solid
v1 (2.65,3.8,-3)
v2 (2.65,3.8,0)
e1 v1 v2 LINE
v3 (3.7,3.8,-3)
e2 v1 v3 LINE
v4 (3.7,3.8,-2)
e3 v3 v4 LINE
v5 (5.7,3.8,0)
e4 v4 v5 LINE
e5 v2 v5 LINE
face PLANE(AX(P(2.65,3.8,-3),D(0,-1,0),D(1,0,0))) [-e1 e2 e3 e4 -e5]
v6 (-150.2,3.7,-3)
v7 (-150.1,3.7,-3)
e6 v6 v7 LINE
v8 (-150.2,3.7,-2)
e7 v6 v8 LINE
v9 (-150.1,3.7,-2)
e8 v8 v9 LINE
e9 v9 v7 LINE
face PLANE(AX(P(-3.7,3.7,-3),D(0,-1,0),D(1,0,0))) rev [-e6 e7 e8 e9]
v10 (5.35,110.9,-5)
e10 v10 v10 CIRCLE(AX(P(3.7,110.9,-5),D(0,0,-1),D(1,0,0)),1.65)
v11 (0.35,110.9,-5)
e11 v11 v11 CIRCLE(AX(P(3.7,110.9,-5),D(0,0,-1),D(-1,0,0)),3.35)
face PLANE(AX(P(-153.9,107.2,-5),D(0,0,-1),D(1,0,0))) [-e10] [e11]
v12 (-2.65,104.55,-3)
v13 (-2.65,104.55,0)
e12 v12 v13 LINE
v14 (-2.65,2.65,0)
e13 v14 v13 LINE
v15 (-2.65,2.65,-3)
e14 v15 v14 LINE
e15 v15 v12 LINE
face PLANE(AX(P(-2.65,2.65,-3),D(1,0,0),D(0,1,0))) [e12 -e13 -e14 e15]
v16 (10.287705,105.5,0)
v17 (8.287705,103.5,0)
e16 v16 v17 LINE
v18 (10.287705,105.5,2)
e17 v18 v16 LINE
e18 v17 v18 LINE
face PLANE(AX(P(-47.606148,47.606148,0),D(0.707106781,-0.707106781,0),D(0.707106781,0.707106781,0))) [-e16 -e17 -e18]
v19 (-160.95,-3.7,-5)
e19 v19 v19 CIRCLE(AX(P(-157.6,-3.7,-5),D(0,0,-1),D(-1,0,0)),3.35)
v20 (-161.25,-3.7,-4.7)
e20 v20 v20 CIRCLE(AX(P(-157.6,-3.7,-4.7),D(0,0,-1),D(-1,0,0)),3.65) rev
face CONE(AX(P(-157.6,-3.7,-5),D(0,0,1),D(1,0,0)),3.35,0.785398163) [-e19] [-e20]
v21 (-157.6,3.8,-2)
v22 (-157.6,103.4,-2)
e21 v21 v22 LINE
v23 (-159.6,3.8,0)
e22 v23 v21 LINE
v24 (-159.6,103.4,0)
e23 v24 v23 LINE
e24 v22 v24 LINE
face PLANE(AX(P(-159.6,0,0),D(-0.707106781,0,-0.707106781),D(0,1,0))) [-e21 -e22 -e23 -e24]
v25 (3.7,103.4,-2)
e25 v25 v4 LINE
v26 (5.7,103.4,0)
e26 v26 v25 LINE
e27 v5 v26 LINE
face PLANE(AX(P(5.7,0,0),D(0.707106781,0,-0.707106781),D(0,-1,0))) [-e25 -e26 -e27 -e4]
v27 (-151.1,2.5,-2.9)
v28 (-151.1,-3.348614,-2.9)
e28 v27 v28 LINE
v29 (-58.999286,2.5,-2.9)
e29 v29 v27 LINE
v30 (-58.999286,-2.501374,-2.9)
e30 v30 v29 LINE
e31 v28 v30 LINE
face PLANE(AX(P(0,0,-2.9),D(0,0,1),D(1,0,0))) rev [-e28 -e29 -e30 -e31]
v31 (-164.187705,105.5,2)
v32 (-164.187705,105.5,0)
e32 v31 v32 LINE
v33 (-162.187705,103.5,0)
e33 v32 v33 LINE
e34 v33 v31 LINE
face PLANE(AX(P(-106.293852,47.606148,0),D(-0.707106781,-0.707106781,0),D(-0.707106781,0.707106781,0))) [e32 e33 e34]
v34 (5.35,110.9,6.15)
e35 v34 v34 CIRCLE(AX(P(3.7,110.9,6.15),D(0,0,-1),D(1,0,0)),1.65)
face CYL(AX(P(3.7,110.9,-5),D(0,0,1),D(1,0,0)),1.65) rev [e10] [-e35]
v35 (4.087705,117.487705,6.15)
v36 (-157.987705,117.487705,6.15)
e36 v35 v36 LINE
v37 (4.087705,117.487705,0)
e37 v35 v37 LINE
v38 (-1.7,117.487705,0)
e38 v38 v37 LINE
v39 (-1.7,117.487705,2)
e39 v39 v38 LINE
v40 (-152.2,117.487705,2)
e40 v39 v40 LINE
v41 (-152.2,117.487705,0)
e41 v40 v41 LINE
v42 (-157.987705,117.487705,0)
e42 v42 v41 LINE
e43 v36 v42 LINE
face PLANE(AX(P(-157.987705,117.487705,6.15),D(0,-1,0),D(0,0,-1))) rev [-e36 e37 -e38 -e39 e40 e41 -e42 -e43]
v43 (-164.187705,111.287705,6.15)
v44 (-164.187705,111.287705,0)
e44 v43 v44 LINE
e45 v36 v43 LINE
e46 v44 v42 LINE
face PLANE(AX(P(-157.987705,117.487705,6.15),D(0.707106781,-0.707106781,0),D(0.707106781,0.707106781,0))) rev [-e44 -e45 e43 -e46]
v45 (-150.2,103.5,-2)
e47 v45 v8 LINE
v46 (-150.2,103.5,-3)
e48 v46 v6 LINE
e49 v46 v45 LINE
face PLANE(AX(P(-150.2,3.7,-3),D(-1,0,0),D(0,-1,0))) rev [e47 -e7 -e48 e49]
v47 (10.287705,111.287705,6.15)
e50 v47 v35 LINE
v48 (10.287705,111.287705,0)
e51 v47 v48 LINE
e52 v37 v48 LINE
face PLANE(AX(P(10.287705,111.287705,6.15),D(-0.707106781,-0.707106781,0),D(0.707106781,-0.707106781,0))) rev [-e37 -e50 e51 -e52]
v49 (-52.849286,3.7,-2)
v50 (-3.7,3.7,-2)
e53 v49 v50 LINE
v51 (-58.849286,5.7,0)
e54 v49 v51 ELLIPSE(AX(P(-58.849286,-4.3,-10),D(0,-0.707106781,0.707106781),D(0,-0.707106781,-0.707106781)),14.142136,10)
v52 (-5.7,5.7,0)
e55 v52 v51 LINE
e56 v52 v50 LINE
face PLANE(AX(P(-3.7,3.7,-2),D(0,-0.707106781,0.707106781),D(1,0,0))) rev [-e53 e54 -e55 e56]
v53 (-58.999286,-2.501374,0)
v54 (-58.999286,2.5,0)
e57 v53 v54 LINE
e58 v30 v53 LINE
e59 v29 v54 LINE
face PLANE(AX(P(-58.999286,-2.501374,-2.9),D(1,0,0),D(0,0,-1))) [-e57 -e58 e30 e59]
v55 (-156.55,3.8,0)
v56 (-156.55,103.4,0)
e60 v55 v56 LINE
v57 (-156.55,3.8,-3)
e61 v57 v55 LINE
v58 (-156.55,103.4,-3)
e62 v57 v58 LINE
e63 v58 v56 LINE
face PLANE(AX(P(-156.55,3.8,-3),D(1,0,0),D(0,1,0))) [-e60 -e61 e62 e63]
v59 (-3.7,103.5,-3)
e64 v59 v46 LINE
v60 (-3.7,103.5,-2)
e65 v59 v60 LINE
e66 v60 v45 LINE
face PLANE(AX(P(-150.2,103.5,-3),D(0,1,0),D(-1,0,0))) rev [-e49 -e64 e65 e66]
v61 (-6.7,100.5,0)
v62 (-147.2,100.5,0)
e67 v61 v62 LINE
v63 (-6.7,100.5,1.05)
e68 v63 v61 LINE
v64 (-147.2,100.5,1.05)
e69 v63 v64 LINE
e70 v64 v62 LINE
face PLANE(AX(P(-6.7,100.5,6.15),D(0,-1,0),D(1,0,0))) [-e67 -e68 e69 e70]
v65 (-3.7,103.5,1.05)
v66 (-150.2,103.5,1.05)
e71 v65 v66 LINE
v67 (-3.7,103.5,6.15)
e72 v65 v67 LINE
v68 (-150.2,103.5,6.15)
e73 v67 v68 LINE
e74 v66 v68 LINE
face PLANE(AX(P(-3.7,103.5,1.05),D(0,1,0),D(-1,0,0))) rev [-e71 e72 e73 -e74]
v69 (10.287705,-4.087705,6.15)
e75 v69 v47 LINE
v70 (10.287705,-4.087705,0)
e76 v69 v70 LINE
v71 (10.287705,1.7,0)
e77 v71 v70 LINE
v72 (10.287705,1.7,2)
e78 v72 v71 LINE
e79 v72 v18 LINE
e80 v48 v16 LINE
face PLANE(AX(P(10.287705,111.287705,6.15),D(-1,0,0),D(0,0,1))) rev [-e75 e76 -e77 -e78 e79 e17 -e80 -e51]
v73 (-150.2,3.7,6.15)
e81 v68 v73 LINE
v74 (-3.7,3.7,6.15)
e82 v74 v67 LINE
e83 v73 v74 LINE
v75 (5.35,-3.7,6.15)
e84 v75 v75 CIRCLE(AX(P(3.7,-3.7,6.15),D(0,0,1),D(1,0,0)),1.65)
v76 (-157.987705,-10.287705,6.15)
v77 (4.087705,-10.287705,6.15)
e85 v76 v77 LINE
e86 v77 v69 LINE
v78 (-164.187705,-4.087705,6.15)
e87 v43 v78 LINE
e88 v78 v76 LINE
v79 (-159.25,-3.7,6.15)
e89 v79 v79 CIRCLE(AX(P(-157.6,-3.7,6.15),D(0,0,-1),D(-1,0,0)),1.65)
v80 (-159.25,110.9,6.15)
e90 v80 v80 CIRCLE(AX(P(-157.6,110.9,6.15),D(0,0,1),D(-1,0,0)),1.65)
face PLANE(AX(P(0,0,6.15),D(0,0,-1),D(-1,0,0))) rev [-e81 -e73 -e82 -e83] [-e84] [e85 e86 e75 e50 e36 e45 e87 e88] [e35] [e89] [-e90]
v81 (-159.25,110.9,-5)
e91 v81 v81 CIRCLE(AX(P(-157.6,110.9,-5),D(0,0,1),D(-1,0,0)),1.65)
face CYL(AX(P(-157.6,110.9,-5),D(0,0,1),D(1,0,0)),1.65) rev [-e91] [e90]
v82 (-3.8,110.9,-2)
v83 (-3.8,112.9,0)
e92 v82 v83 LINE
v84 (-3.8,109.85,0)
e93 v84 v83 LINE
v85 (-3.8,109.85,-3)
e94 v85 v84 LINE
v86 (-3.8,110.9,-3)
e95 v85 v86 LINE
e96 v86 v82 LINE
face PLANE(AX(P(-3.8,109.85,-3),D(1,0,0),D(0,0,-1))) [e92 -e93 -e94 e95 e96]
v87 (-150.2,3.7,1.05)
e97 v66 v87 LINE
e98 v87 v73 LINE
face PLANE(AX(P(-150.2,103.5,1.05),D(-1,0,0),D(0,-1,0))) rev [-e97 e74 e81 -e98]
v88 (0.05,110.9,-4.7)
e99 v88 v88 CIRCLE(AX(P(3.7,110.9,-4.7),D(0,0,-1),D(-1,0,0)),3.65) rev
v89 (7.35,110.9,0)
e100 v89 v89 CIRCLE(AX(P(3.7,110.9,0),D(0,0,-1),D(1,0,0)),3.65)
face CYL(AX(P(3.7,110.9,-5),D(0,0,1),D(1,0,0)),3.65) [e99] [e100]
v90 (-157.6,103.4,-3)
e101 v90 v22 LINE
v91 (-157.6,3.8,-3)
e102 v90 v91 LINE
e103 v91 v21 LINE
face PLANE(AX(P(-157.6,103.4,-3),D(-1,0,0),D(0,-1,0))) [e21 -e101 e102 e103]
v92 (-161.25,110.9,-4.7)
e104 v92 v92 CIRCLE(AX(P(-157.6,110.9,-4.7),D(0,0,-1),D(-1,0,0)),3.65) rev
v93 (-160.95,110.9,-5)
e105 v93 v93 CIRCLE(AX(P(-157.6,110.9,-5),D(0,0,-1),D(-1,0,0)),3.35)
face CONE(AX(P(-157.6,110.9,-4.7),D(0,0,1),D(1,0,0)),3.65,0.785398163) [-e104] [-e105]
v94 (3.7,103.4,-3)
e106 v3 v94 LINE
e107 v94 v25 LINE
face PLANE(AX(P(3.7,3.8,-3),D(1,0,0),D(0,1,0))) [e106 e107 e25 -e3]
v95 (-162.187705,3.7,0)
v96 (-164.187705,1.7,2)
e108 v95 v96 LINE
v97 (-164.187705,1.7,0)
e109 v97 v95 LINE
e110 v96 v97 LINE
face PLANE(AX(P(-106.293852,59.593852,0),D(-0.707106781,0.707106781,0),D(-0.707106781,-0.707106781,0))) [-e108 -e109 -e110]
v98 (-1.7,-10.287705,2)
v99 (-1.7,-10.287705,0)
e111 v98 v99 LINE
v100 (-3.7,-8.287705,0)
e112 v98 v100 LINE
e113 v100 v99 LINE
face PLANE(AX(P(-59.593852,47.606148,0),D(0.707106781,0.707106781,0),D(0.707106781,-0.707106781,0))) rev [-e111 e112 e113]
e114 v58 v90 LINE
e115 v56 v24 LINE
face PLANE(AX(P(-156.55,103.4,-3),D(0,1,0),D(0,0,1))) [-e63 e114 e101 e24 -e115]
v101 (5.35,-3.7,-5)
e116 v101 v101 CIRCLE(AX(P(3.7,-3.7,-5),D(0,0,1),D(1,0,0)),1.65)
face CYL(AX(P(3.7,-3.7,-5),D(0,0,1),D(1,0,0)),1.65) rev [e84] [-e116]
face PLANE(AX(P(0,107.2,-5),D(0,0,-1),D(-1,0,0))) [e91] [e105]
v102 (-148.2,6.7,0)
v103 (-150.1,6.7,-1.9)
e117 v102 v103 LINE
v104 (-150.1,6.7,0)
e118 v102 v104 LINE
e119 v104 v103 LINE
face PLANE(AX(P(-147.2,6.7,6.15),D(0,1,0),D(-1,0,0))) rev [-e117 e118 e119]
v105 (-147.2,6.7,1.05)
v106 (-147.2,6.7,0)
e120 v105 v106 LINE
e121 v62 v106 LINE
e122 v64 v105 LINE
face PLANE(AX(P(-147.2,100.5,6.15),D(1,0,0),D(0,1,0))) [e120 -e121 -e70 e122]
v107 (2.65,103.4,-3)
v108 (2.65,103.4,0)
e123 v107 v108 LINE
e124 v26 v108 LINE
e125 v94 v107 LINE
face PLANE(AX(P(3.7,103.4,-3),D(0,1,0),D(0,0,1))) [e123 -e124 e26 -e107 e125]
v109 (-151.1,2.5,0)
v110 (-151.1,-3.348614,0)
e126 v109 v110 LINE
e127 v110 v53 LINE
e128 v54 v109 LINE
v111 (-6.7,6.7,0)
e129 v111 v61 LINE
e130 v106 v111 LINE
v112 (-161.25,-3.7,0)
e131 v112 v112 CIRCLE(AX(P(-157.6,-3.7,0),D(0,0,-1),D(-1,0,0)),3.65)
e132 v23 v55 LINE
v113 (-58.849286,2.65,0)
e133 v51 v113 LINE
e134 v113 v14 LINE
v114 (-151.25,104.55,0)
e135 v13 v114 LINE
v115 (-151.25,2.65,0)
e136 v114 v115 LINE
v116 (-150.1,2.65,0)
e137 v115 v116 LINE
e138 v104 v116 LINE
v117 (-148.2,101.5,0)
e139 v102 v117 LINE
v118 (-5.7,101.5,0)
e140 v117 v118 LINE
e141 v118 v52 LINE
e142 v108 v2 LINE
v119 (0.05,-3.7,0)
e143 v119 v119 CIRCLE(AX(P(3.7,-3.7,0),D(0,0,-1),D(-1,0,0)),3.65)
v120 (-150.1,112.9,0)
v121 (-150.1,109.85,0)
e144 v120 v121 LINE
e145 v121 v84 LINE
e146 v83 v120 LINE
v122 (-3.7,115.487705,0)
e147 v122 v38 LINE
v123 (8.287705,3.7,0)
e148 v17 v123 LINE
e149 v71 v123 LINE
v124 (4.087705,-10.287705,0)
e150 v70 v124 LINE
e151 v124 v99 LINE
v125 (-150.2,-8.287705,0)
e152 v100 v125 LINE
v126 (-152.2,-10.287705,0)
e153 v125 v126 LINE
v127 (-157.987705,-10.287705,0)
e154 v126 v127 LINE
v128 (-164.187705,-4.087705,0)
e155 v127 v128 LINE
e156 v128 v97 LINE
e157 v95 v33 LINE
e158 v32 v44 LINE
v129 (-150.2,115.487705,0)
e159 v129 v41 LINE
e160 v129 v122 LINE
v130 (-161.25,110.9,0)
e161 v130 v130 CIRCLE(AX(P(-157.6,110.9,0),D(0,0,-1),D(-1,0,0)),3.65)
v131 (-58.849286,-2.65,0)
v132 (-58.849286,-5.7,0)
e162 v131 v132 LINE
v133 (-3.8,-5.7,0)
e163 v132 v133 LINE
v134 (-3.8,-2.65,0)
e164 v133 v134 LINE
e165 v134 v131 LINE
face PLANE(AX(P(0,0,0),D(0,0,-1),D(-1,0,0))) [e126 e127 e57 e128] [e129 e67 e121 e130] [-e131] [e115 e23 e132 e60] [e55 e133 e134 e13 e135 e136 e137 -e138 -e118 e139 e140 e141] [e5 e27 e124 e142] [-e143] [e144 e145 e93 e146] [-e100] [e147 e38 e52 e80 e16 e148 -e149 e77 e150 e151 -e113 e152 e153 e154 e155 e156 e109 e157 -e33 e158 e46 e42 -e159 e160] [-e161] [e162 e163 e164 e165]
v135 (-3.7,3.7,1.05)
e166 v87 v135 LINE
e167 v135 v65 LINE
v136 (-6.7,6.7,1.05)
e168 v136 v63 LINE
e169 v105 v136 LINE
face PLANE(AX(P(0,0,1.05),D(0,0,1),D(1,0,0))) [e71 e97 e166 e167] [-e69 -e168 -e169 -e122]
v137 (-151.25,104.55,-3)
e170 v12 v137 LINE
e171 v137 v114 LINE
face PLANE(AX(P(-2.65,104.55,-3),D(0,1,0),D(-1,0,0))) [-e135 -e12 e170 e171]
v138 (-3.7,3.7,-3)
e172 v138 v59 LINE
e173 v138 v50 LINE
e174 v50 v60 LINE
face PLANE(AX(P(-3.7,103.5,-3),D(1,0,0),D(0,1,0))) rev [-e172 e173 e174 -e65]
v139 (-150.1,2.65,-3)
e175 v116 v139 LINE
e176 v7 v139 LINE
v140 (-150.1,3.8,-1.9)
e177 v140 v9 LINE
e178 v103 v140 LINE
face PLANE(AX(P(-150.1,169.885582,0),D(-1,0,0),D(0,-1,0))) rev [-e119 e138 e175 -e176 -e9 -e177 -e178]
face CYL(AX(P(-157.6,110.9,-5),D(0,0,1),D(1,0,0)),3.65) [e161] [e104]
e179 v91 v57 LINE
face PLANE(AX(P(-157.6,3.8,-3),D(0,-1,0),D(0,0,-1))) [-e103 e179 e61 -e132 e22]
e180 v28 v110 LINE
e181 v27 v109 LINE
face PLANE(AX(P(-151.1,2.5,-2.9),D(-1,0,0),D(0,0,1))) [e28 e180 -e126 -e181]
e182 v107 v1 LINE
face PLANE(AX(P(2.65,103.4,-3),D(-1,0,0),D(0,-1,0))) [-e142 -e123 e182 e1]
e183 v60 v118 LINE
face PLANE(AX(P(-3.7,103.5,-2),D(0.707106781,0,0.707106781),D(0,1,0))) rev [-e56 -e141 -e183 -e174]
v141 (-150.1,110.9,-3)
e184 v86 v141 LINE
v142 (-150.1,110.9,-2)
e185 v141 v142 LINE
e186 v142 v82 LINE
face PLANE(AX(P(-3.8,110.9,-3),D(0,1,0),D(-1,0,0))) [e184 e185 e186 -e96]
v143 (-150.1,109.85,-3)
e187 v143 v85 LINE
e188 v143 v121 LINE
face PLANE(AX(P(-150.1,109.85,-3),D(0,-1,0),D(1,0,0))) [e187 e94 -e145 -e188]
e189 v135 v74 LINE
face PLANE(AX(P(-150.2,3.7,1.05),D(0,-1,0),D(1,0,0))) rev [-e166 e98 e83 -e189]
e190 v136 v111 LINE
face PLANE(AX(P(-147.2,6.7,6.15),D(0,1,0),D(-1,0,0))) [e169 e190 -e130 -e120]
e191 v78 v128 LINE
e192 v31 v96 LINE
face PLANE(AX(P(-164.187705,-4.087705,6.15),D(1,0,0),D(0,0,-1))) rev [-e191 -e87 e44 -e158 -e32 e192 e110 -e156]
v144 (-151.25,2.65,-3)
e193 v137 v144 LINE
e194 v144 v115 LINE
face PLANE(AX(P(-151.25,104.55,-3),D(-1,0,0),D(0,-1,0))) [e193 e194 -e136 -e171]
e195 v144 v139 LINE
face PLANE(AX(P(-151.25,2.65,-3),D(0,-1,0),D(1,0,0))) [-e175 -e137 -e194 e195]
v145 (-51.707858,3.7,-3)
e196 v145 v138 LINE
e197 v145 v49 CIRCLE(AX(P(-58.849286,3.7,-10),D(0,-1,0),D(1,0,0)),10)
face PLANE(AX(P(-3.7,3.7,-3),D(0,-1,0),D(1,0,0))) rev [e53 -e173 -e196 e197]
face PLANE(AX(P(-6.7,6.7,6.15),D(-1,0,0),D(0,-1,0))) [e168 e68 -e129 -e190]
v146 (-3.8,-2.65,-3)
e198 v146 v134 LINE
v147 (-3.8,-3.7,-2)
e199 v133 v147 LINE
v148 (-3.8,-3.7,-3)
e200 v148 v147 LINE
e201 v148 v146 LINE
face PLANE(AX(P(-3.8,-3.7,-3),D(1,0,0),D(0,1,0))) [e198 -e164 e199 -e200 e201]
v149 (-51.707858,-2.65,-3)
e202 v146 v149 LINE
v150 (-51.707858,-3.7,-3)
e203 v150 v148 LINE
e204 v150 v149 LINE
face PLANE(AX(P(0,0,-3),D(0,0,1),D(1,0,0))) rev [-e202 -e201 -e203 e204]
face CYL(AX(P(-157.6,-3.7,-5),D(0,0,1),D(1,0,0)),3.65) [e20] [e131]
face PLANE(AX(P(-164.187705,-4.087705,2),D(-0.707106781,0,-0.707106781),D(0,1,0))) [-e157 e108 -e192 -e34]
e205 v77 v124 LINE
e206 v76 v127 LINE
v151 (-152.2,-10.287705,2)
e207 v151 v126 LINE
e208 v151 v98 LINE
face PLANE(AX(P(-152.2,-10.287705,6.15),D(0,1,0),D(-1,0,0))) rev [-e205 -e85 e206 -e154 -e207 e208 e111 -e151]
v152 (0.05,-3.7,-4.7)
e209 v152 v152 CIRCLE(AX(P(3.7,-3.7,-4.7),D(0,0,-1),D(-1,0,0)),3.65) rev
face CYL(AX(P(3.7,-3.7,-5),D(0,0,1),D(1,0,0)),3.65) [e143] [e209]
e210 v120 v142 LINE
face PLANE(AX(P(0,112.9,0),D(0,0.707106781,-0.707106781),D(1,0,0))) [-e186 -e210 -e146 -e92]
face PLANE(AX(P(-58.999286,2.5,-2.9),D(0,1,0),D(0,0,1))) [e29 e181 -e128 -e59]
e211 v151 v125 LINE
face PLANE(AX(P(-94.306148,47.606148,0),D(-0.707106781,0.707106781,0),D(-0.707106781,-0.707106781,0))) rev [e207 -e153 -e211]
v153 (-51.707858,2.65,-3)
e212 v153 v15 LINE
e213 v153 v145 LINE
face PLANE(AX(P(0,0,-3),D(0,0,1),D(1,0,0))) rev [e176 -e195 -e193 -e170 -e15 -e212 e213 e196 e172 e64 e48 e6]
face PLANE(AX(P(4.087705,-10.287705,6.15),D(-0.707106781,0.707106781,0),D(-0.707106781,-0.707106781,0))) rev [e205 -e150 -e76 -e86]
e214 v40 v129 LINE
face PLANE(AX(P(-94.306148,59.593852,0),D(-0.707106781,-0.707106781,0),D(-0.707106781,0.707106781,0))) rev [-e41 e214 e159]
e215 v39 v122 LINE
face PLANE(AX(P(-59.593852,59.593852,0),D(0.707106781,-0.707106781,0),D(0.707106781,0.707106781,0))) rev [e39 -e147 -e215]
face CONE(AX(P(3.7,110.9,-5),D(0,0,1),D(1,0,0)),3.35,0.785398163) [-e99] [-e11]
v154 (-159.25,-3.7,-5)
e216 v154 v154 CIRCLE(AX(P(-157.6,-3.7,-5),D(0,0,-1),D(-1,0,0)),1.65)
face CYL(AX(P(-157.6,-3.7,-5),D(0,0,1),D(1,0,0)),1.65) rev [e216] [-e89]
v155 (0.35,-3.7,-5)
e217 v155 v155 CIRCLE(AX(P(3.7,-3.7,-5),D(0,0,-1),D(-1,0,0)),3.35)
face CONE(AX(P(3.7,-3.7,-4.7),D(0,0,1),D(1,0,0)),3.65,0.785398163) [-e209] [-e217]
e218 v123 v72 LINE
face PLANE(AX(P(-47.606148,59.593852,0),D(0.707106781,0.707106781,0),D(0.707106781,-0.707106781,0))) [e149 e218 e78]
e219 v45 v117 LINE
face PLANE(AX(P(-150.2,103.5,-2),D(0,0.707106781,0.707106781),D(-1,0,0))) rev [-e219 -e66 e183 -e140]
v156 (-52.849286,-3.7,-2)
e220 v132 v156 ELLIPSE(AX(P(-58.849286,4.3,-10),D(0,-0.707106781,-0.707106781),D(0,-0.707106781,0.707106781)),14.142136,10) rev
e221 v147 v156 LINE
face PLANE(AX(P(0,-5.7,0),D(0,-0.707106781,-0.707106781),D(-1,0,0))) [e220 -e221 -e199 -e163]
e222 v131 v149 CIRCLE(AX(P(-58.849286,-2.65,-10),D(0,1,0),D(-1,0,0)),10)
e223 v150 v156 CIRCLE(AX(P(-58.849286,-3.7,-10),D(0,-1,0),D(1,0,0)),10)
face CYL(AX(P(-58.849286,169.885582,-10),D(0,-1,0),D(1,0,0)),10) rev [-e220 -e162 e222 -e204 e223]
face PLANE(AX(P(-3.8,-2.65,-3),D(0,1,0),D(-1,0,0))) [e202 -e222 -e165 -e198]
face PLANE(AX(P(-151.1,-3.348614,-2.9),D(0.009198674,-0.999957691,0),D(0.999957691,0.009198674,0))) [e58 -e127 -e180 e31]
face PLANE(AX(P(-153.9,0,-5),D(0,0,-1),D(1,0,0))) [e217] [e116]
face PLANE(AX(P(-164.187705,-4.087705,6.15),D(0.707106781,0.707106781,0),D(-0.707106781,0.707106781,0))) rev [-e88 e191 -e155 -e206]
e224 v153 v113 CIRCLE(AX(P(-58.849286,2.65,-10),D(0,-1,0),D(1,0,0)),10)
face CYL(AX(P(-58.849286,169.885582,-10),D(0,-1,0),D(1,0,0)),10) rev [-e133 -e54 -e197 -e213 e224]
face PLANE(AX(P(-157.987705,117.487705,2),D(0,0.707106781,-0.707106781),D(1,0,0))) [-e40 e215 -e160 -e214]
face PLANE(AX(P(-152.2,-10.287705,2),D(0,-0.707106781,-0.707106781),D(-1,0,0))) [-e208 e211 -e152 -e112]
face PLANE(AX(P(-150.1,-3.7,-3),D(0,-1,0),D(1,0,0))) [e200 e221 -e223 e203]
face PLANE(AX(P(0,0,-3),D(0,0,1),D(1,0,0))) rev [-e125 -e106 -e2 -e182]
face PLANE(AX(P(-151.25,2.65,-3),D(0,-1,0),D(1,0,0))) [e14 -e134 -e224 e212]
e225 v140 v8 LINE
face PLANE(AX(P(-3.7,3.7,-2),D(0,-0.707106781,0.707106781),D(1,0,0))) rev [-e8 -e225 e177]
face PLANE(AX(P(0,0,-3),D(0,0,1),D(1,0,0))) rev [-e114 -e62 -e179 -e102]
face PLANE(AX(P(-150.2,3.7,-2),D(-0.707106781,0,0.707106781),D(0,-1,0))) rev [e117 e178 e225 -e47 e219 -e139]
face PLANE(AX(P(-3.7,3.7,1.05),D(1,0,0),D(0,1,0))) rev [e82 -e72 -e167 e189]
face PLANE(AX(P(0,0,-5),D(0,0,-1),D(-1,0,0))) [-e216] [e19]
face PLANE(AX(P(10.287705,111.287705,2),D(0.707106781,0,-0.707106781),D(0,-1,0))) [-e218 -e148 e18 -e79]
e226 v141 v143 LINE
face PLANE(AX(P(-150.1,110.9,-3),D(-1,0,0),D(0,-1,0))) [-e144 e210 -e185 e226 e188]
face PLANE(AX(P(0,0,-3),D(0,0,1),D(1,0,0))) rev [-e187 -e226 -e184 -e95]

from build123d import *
from build123d.topology import SkipClean

# Parameters (mm, degrees)
BOSS_EXTRUDE1_DEPTH                      = 3
BOSS_EXTRUDE1_2_DEPTH                    = 3
BOSS_EXTRUDE1_3_DEPTH                    = 3
BOSS_EXTRUDE1_4_DEPTH                    = 3
BOSS_EXTRUDE1_5_DEPTH                    = 3
BOSS_EXTRUDE2_DEPTH                      = 6.15
CHAMFER1_SIZE                            = 2
BOSS_EXTRUDE3_DEPTH                      = 3
MIRROR1_DEPTH                            = 2
CHAMFER2_SIZE                            = 2
CUT_EXTRUDE2_DEPTH                       = 5.1
BOSS_EXTRUDE4_DEPTH                      = 5
CUT_EXTRUDE4_DEPTH                       = 202.98709309422546
MIRROR3_AT_THE_SECOND_PLANE_COPY_1_DEPTH = 5
MIRROR3_AT_THE_SECOND_PLANE_COPY_2_DEPTH = 202.98709309422546
CHAMFER3_SIZE                            = 0.3
CUT_EXTRUDE3_REACH                       = 210.139
BOSS_EXTRUDE5_DEPTH                      = 2.9


# Read off the part's stored shape, not the designer's step: Mirror1
with BuildPart() as part:
    # Sketch1 → Boss-Extrude1 (new body)
    with BuildSketch(Plane.XY):
        Polygon((-156.55, 3.799999999998499), (-156.55000000000007, 103.39999999999857), (-157.60000000000005, 103.39999999999857), (-157.60000000000002, 3.799999999998499), align=None)
    extrude(amount=-BOSS_EXTRUDE1_DEPTH)



with BuildPart() as body_2:
    # Sketch1 → Boss-Extrude1 2 (new body)
    with BuildSketch(Plane.XY):
        Polygon((-150.1, 109.84999999999852), (-3.800000000000109, 109.84999999999862), (-3.800000000000109, 110.89999999999861), (-150.10000000000008, 110.8999999999985), align=None)
    extrude(amount=-BOSS_EXTRUDE1_2_DEPTH)


with BuildPart() as body_3:
    # Sketch1 → Boss-Extrude1 3 (new body)
    with BuildSketch(Plane.XY):
        Polygon((2.6499999999999164, 103.39999999999867), (2.649999999999972, 3.7999999999985548), (3.6999999999999673, 3.7999999999985477), (3.6999999999999256, 103.39999999999867), align=None)
    extrude(amount=-BOSS_EXTRUDE1_3_DEPTH)


with BuildPart() as body_4:
    # Sketch1 → Boss-Extrude1 4 (new body)
    with BuildSketch(Plane.XY):
        Polygon((-3.800000000000109, -2.6500000000013597), (-150.09999999999997, -2.650000000001457), (-150.09999999999997, -3.700000000001438), (-3.8000000000000393, -3.7000000000013826), align=None)
    extrude(amount=-BOSS_EXTRUDE1_4_DEPTH)


with BuildPart() as body_5:
    # Sketch1 → Boss-Extrude1 5 (new body)
    with BuildSketch(Plane.XY):
        Polygon((-151.25, 2.6499999999985424), (-2.6500000000000274, 2.6499999999986117), (-2.650000000000083, 104.54999999999862), (-151.25000000000006, 104.54999999999853), align=None)
        Polygon((-150.20000000000005, 103.49999999999854), (-3.7000000000000783, 103.49999999999862), (-3.700000000000023, 3.699999999998614), (-150.2, 3.699999999998545), align=None, mode=Mode.SUBTRACT)
    extrude(amount=-BOSS_EXTRUDE1_5_DEPTH)


with BuildPart() as part_1:
    add(part.part)

    add(body_2.part)  # Boss-Extrude2 merges body 2

    add(body_3.part)  # Boss-Extrude2 merges body 3

    add(body_4.part)  # Boss-Extrude2 merges body 4

    add(body_5.part)  # Boss-Extrude2 merges body 5
    # Sketch2 → Boss-Extrude2 (add)
    with BuildSketch(Plane.XY):
        Polygon((-152.20000000000053, -10.287704918043708), (-157.98770491803333, -10.287704918043712), (-164.18770491803335, -4.087704918043719), (-164.18770491803335, 1.699999999989038), (-164.18770491803284, 105.49999999999856), (-164.18770491803284, 111.28770491803135), (-157.98770491803285, 117.48770491803134), (-152.20000000000007, 117.48770491803134), (-1.700000000000101, 117.48770491803131), (4.087704918032683, 117.48770491803131), (10.287704918032786, 111.28770491801959), (10.287704918032786, 105.49999999998684), (10.287704918032786, 1.6999999999890605), (10.287704918032786, -4.087704918043723), (4.087704918032788, -10.28770491804372), (-1.6999999999999682, -10.28770491804372), align=None)
        Polygon((-147.2, 6.699999999998546), (-6.700000000000024, 6.699999999998613), (-6.700000000000077, 100.49999999999862), (-147.20000000000005, 100.49999999999854), align=None, mode=Mode.SUBTRACT)
    extrude(amount=BOSS_EXTRUDE2_DEPTH)

    # Chamfer1
    chamfer1_edges = [part_1.edges().sort_by_distance(p)[0] for p in [
        (7.187704918032787, -7.187704918043722, 0),
        (10.287704918032786, 53.59999999998793, 0),
        (7.187704918032734, 114.38770491802545, 0),
        (-76.95000000000007, 117.48770491803133, 0),
        (-161.08770491803284, 114.38770491803135, 0),
        (-164.1877049180331, 53.59999999999382, 0),
        (-161.08770491803335, -7.187704918043716, 0),
        (-76.95000000000027, -10.287704918043715, 0),
    ]]
    chamfer(chamfer1_edges, length=CHAMFER1_SIZE)

    # Sketch4 → Boss-Extrude3 (add)
    with BuildSketch(Plane(origin=(0, 0, 0), x_dir=(-1, 0, 0), z_dir=(0, 0, -1))):
        Polygon((1.7000000000001219, 1.6999999999889326), (-10.287704918032786, 1.699999999988929), (-10.287704918032786, -4.087704918043727), (-4.087704918032788, -10.28770491804372), (1.7000000000001094, -10.28770491804372), align=None)
        Polygon((164.18770491803335, -4.087704918043719), (164.18770491803332, 1.6999999999889503), (152.20000000000041, 1.6999999999889481), (152.20000000000007, -10.287704918043712), (157.98770491803333, -10.287704918043712), align=None)
        Polygon((157.98770491803285, 117.48770491803134), (152.20000000000033, 117.48770491803134), (152.20000000000002, 105.4999999999988), (164.18770491803286, 105.4999999999988), (164.18770491803284, 111.28770491803135), align=None)
        Polygon((1.7000000000001085, 105.49999999999868), (1.7000000000001094, 117.48770491803131), (-4.087704918032671, 117.48770491803131), (-10.287704918032784, 111.28770491801959), (-10.287704918032786, 105.49999999999868), align=None)
    extrude(amount=-BOSS_EXTRUDE3_DEPTH)

    # Sketch5 → Loft1 section 0
    with BuildSketch(Plane(origin=(0, 0, 0), x_dir=(-1, 0, 0), z_dir=(0, 0, -1)), mode=Mode.PRIVATE) as loft1_s0:
        with BuildLine():
            Line((-10.287704918032686, 105.49999999999868), (-8.287704918032702, 103.49999999999875))
            Line((-8.287704918032702, 103.49999999999875), (-8.287704918032702, 105.49999999999868))
            Line((-8.287704918032702, 105.49999999999868), (-10.287704918032686, 105.49999999999868))
        make_face()
    loft([loft1_s0.sketch, Vertex(10.287704918, 105.5, 2)])

    # Sketch7 → Loft2 section 0
    with BuildSketch(Plane(origin=(0, 0, 0), x_dir=(-1, 0, 0), z_dir=(0, 0, -1)), mode=Mode.PRIVATE) as loft2_s0:
        with BuildLine():
            Line((1.700000000000108, 117.48770491803134), (3.7000000000000757, 115.48770491803135))
            Line((3.7000000000000757, 115.48770491803135), (1.7000000000001079, 115.48770491803133))
            Line((1.7000000000001079, 115.48770491803133), (1.700000000000108, 117.48770491803134))
        make_face()
    loft([Vertex(-1.7, 117.487704918, 2), loft2_s0.sketch])

    # Mirror1 outline → Mirror1 (add)
    with BuildSketch(Plane.XY):
        Polygon((-1.7, 1.7), (10.287704918, 1.7), (-1.7, 13.687704918), align=None)
        Polygon((-1.7, -10.287704918), (-1.7, 1.7), (-13.687704918, 1.7), align=None)
        Polygon((-152.2, -10.287704918), (-140.212295082, 1.7), (-152.2, 1.7), align=None)
        Polygon((-152.2, 105.5), (-140.212295082, 105.5), (-152.2, 117.487704918), align=None)
        Polygon((-164.187704918, 1.7), (-152.2, 1.7), (-152.2, 13.687704918), align=None)
        Polygon((-152.2, 93.512295082), (-152.2, 105.5), (-164.187704918, 105.5), align=None)
    extrude(amount=MIRROR1_DEPTH)

    # Chamfer2
    chamfer2_edges = [part_1.edges().sort_by_distance(p)[0] for p in [
        (-76.9500000000001, 110.89999999999856, 0),
        (-157.60000000000002, 53.59999999999854, 0),
        (3.6999999999999464, 53.59999999999861, 0),
        (-76.95, -3.7000000000014106, 0),
        (-150.20000000000002, 53.599999999998545, 0),
        (-76.95000000000006, 103.49999999999858, 0),
        (-3.700000000000051, 53.599999999998616, 0),
        (-76.95, 3.6999999999985795, 0),
    ]]
    chamfer(chamfer2_edges, length=CHAMFER2_SIZE)

    # Sketch11 → Cut-Extrude2 (cut)
    with BuildSketch(Plane.XY.offset(6.15)):
        Polygon((-150.2, 3.6999999999985453), (-3.700000000000023, 3.6999999999986137), (-3.7000000000000783, 103.49999999999862), (-150.20000000000005, 103.49999999999854), align=None)
    extrude(amount=-CUT_EXTRUDE2_DEPTH, mode=Mode.SUBTRACT)

    # Sketch12 → Boss-Extrude4 (add)
    with BuildSketch(Plane(origin=(0, 0, 0), x_dir=(-1, 0, 0), z_dir=(0, 0, -1))):
        with BuildLine():
            ThreePointArc((161.25000000000057, -3.700000000010667), (158.9967945281331, -0.32783970634446824), (155.01906024866963, -1.119060248679844))
            Line((155.01906024866966, -1.1190602486798047), (156.4332738110427, -2.5332738110529105))
            ThreePointArc((156.4332738110427, -2.533273811052915), (158.23142766340297, -2.175598771367012), (159.2500000000006, -3.700000000010667))
            ThreePointArc((159.2500000000006, -3.7000000000106676), (159.12440122864422, -4.331427663413119), (158.76672618895833, -4.866726188968555))
            Line((158.7667261889583, -4.866726188968588), (160.18093975133135, -6.280939751341704))
            ThreePointArc((160.18093975133138, -6.2809397513416645), (160.97216029366675, -5.096794528143313), (161.25000000000057, -3.700000000010668))
        make_face()
        with BuildLine():
            Line((156.4332738110427, -2.5332738110529105), (155.01906024866966, -1.1190602486798047))
            ThreePointArc((155.01906024866963, -1.119060248679844), (155.0190602486697, -6.280939751341531), (160.18093975133138, -6.2809397513416645))
            Line((160.18093975133135, -6.280939751341704), (158.7667261889583, -4.866726188968588))
            ThreePointArc((158.76672618895833, -4.866726188968555), (156.43327381104277, -4.866726188968477), (156.4332738110427, -2.533273811052915))
        make_face()
    boss_extrude4 = extrude(amount=BOSS_EXTRUDE4_DEPTH)

    # Sketch12<4> → Cut-Extrude4 (cut, through all)
    with SkipClean():  # the faces are left unmerged after this step: merging them gives an invalid solid
        with BuildSketch(Plane(origin=(0, 0, 0), x_dir=(-1, 0, 0), z_dir=(0, 0, -1))):
            with BuildLine():
                ThreePointArc((159.2500000000006, -3.700000000010667), (158.23142766340297, -2.175598771367012), (156.4332738110427, -2.533273811052915))
                Line((156.4332738110427, -2.5332738110529105), (158.7667261889583, -4.866726188968588))
                ThreePointArc((158.76672618895833, -4.866726188968555), (159.12440122864422, -4.331427663413119), (159.2500000000006, -3.7000000000106676))
            make_face()
            with BuildLine():
                Line((158.7667261889583, -4.866726188968588), (156.4332738110427, -2.5332738110529105))
                ThreePointArc((156.4332738110427, -2.533273811052915), (156.43327381104277, -4.866726188968477), (158.76672618895833, -4.866726188968555))
            make_face()
        cut_extrude4 = extrude(amount=-CUT_EXTRUDE4_DEPTH, mode=Mode.SUBTRACT)

    # Mirror3: Boss-Extrude4, Cut-Extrude4 across plane
    with SkipClean():  # the faces are left unmerged after this step: merging them gives an invalid solid
        add(boss_extrude4.mirror(Plane(origin=(-76.95, -4.412e-14, 0), x_dir=(0, 0, 1), z_dir=(1, 5.7e-16, 0))))
        add(cut_extrude4.mirror(Plane(origin=(-76.95, -4.412e-14, 0), x_dir=(0, 0, 1), z_dir=(1, 5.7e-16, 0))), mode=Mode.SUBTRACT)

    # Mirror3 at the second plane: Boss-Extrude4, Cut-Extrude4 across plane
    add(boss_extrude4.mirror(Plane(origin=(-2.846e-14, 53.59999999999862, 0), x_dir=(0, 0, 1), z_dir=(5.3e-16, -1, 0))))
    add(cut_extrude4.mirror(Plane(origin=(-2.846e-14, 53.59999999999862, 0), x_dir=(0, 0, 1), z_dir=(5.3e-16, -1, 0))), mode=Mode.SUBTRACT)

    # Mirror3 at the second plane copy 1 sketc → Mirror3 at the second plane copy 1 (add)
    with BuildSketch(Plane(origin=(-153.90000000000006, 107.19999999999717, 0), x_dir=(1, -8e-17, 0), z_dir=(0, 0, -1))):
        with BuildLine():
            ThreePointArc((161.25000000000057, -3.700000000010667), (158.9967945281331, -0.32783970634446824), (155.01906024866963, -1.119060248679844))
            Line((155.01906024866966, -1.1190602486798047), (156.4332738110427, -2.5332738110529105))
            ThreePointArc((156.4332738110427, -2.533273811052915), (158.23142766340297, -2.175598771367012), (159.2500000000006, -3.700000000010667))
            ThreePointArc((159.2500000000006, -3.7000000000106676), (159.12440122864422, -4.331427663413119), (158.76672618895833, -4.866726188968555))
            Line((158.7667261889583, -4.866726188968588), (160.18093975133135, -6.280939751341704))
            ThreePointArc((160.18093975133138, -6.2809397513416645), (160.97216029366675, -5.096794528143313), (161.25000000000057, -3.700000000010668))
        make_face()
        with BuildLine():
            Line((156.4332738110427, -2.5332738110529105), (155.01906024866966, -1.1190602486798047))
            ThreePointArc((155.01906024866963, -1.119060248679844), (155.0190602486697, -6.280939751341531), (160.18093975133138, -6.2809397513416645))
            Line((160.18093975133135, -6.280939751341704), (158.7667261889583, -4.866726188968588))
            ThreePointArc((158.76672618895833, -4.866726188968555), (156.43327381104277, -4.866726188968477), (156.4332738110427, -2.533273811052915))
        make_face()
    extrude(amount=MIRROR3_AT_THE_SECOND_PLANE_COPY_1_DEPTH)

    # Mirror3 at the second plane copy 2 sketc → Mirror3 at the second plane copy 2 (cut, through all)
    with BuildSketch(Plane(origin=(-153.90000000000006, 107.19999999999717, 0), x_dir=(1, -8e-17, 0), z_dir=(0, 0, -1))):
        with BuildLine():
            ThreePointArc((159.2500000000006, -3.700000000010667), (158.23142766340297, -2.175598771367012), (156.4332738110427, -2.533273811052915))
            Line((156.4332738110427, -2.5332738110529105), (158.7667261889583, -4.866726188968588))
            ThreePointArc((158.76672618895833, -4.866726188968555), (159.12440122864422, -4.331427663413119), (159.2500000000006, -3.7000000000106676))
        make_face()
        with BuildLine():
            Line((158.7667261889583, -4.866726188968588), (156.4332738110427, -2.5332738110529105))
            ThreePointArc((156.4332738110427, -2.533273811052915), (156.43327381104277, -4.866726188968477), (158.76672618895833, -4.866726188968555))
        make_face()
    extrude(amount=-MIRROR3_AT_THE_SECOND_PLANE_COPY_2_DEPTH, mode=Mode.SUBTRACT)

    # Chamfer3
    chamfer3_edges = [part_1.edges().sort_by_distance(p)[0] for p in [
        (-160.1809397513315, -6.280939751341554, -5),
        (-160.18093975133155, 113.48093975133862, -5),
        (6.2809397513314895, -6.28093975134146, -5),
        (6.280939751331427, 113.48093975133872, -5),
    ]]
    chamfer(chamfer3_edges, length=CHAMFER3_SIZE)

    # Cut-Extrude3: up to this face of the body (flat: up to its plane)
    cut_extrude3_end = Plane(part_1.part.faces().sort_by_distance((-76.95, 6.7, 0.525))[0])
    # Sketch13 → Cut-Extrude3 (cut, up to the picked face)
    with BuildSketch(Plane.XZ.offset(10.287704918043616), mode=Mode.PRIVATE) as cut_extrude3_sk1:
        with BuildLine():
            Line((-150.0999999999928, -67.22813782152119), (-150.0999999999928, -72.29000000000016))
            Line((-150.0999999999928, -72.29000000000016), (-3.7999999999928646, -72.29000000000016))
            Line((-3.7999999999928646, -72.29000000000016), (-3.7999999999928646, -67.22813782152119))
            Line((-3.7999999999928646, -67.22813782152119), (-6.199494936604516, -66.24854811567278))
            Line((-6.199494936604516, -66.24854811567278), (-6.199494936604544, -58.741451884327546))
            Line((-6.199494936604544, -58.741451884327546), (-3.7999999999928646, -57.761862178479156))
            Line((-3.7999999999928646, -57.761862178479156), (-3.7999999999928646, -49.700000000000145))
            Line((-3.7999999999928646, -49.700000000000145), (-75.49999999999261, -49.700000000000145))
            ThreePointArc((-75.49999999999261, -49.700000000000145), (-82.57106781185809, -46.77106781186563), (-85.49999999999261, -39.70000000000015))
            Line((-85.49999999999261, -39.70000000000015), (-85.49999999999261, -38.980000000000146))
            ThreePointArc((-85.49999999999261, -38.980000000000146), (-82.57106781185809, -31.908932188134674), (-75.49999999999261, -28.98000000000015))
            Line((-75.49999999999261, -28.98000000000015), (-58.849285999992624, -28.980000000000146))
            ThreePointArc((-58.849285999992624, -28.980000000000146), (-51.77821818812715, -26.05106781186562), (-48.849285999992624, -18.980000000000143))
            Line((-48.849285999992624, -18.980000000000143), (-48.849285999992624, -10.000000000000114))
            ThreePointArc((-48.849285999992624, -10.000000000000114), (-51.77821818812715, -2.9289321881346364), (-58.84928599999263, -1.1102e-13))
            Line((-58.84928599999263, -1.1102e-13), (-150.0999999999928, -1.1102e-13))
            Line((-150.0999999999928, -1.1102e-13), (-150.0999999999928, -7.231885425213205))
            ThreePointArc((-150.0999999999928, -7.231885425213205), (-149.02970711803647, -5.622570324451265), (-147.19999999999283, -5.000000000000131))
            Line((-147.19999999999283, -5.000000000000131), (-100.49999999999262, -5.0000000000001155))
            ThreePointArc((-100.49999999999262, -5.0000000000001155), (-93.42893218812715, -7.928932188134643), (-90.49999999999262, -15.000000000000117))
            Line((-90.49999999999262, -15.000000000000117), (-90.49999999999261, -51.70000000000015))
            ThreePointArc((-90.49999999999261, -51.70000000000015), (-91.37867965643296, -53.8213203435598), (-93.49999999999261, -54.70000000000015))
            Line((-93.49999999999261, -54.70000000000015), (-147.1999999999928, -54.70000000000015))
            ThreePointArc((-147.1999999999928, -54.70000000000015), (-149.02970711803647, -54.077429675549006), (-150.0999999999928, -52.468114574787016))
            Line((-150.0999999999928, -52.468114574787016), (-150.0999999999928, -57.761862178479156))
            Line((-150.0999999999928, -57.761862178479156), (-147.70050506338106, -58.74145188432755))
            Line((-147.70050506338106, -58.74145188432755), (-147.70050506338112, -66.24854811567279))
            Line((-147.70050506338112, -66.24854811567279), (-150.0999999999928, -67.22813782152119))
        make_face()
    cut_extrude3_tool1 = split(extrude(cut_extrude3_sk1.sketch, amount=-CUT_EXTRUDE3_REACH, mode=Mode.PRIVATE), bisect_by=cut_extrude3_end, keep=Keep.BOTH, mode=Mode.PRIVATE)
    add(cut_extrude3_tool1.solids().sort_by(Axis((-150.02498, -10.287705, -55.370637), (-6e-16, 1, 0)))[0], mode=Mode.SUBTRACT)

    # Sketch14 → Boss-Extrude5 (add)
    with BuildSketch(Plane(origin=(0, 0, 0), x_dir=(-1, 0, 0), z_dir=(0, 0, -1))):
        Polygon((58.99928599999263, -2.5013735128958055), (58.99928599999263, 2.4999999999986255), (151.1, 2.4999999999986255), (151.1, -3.3486137939698013), align=None)
    extrude(amount=BOSS_EXTRUDE5_DEPTH)


solid = part_1.part
